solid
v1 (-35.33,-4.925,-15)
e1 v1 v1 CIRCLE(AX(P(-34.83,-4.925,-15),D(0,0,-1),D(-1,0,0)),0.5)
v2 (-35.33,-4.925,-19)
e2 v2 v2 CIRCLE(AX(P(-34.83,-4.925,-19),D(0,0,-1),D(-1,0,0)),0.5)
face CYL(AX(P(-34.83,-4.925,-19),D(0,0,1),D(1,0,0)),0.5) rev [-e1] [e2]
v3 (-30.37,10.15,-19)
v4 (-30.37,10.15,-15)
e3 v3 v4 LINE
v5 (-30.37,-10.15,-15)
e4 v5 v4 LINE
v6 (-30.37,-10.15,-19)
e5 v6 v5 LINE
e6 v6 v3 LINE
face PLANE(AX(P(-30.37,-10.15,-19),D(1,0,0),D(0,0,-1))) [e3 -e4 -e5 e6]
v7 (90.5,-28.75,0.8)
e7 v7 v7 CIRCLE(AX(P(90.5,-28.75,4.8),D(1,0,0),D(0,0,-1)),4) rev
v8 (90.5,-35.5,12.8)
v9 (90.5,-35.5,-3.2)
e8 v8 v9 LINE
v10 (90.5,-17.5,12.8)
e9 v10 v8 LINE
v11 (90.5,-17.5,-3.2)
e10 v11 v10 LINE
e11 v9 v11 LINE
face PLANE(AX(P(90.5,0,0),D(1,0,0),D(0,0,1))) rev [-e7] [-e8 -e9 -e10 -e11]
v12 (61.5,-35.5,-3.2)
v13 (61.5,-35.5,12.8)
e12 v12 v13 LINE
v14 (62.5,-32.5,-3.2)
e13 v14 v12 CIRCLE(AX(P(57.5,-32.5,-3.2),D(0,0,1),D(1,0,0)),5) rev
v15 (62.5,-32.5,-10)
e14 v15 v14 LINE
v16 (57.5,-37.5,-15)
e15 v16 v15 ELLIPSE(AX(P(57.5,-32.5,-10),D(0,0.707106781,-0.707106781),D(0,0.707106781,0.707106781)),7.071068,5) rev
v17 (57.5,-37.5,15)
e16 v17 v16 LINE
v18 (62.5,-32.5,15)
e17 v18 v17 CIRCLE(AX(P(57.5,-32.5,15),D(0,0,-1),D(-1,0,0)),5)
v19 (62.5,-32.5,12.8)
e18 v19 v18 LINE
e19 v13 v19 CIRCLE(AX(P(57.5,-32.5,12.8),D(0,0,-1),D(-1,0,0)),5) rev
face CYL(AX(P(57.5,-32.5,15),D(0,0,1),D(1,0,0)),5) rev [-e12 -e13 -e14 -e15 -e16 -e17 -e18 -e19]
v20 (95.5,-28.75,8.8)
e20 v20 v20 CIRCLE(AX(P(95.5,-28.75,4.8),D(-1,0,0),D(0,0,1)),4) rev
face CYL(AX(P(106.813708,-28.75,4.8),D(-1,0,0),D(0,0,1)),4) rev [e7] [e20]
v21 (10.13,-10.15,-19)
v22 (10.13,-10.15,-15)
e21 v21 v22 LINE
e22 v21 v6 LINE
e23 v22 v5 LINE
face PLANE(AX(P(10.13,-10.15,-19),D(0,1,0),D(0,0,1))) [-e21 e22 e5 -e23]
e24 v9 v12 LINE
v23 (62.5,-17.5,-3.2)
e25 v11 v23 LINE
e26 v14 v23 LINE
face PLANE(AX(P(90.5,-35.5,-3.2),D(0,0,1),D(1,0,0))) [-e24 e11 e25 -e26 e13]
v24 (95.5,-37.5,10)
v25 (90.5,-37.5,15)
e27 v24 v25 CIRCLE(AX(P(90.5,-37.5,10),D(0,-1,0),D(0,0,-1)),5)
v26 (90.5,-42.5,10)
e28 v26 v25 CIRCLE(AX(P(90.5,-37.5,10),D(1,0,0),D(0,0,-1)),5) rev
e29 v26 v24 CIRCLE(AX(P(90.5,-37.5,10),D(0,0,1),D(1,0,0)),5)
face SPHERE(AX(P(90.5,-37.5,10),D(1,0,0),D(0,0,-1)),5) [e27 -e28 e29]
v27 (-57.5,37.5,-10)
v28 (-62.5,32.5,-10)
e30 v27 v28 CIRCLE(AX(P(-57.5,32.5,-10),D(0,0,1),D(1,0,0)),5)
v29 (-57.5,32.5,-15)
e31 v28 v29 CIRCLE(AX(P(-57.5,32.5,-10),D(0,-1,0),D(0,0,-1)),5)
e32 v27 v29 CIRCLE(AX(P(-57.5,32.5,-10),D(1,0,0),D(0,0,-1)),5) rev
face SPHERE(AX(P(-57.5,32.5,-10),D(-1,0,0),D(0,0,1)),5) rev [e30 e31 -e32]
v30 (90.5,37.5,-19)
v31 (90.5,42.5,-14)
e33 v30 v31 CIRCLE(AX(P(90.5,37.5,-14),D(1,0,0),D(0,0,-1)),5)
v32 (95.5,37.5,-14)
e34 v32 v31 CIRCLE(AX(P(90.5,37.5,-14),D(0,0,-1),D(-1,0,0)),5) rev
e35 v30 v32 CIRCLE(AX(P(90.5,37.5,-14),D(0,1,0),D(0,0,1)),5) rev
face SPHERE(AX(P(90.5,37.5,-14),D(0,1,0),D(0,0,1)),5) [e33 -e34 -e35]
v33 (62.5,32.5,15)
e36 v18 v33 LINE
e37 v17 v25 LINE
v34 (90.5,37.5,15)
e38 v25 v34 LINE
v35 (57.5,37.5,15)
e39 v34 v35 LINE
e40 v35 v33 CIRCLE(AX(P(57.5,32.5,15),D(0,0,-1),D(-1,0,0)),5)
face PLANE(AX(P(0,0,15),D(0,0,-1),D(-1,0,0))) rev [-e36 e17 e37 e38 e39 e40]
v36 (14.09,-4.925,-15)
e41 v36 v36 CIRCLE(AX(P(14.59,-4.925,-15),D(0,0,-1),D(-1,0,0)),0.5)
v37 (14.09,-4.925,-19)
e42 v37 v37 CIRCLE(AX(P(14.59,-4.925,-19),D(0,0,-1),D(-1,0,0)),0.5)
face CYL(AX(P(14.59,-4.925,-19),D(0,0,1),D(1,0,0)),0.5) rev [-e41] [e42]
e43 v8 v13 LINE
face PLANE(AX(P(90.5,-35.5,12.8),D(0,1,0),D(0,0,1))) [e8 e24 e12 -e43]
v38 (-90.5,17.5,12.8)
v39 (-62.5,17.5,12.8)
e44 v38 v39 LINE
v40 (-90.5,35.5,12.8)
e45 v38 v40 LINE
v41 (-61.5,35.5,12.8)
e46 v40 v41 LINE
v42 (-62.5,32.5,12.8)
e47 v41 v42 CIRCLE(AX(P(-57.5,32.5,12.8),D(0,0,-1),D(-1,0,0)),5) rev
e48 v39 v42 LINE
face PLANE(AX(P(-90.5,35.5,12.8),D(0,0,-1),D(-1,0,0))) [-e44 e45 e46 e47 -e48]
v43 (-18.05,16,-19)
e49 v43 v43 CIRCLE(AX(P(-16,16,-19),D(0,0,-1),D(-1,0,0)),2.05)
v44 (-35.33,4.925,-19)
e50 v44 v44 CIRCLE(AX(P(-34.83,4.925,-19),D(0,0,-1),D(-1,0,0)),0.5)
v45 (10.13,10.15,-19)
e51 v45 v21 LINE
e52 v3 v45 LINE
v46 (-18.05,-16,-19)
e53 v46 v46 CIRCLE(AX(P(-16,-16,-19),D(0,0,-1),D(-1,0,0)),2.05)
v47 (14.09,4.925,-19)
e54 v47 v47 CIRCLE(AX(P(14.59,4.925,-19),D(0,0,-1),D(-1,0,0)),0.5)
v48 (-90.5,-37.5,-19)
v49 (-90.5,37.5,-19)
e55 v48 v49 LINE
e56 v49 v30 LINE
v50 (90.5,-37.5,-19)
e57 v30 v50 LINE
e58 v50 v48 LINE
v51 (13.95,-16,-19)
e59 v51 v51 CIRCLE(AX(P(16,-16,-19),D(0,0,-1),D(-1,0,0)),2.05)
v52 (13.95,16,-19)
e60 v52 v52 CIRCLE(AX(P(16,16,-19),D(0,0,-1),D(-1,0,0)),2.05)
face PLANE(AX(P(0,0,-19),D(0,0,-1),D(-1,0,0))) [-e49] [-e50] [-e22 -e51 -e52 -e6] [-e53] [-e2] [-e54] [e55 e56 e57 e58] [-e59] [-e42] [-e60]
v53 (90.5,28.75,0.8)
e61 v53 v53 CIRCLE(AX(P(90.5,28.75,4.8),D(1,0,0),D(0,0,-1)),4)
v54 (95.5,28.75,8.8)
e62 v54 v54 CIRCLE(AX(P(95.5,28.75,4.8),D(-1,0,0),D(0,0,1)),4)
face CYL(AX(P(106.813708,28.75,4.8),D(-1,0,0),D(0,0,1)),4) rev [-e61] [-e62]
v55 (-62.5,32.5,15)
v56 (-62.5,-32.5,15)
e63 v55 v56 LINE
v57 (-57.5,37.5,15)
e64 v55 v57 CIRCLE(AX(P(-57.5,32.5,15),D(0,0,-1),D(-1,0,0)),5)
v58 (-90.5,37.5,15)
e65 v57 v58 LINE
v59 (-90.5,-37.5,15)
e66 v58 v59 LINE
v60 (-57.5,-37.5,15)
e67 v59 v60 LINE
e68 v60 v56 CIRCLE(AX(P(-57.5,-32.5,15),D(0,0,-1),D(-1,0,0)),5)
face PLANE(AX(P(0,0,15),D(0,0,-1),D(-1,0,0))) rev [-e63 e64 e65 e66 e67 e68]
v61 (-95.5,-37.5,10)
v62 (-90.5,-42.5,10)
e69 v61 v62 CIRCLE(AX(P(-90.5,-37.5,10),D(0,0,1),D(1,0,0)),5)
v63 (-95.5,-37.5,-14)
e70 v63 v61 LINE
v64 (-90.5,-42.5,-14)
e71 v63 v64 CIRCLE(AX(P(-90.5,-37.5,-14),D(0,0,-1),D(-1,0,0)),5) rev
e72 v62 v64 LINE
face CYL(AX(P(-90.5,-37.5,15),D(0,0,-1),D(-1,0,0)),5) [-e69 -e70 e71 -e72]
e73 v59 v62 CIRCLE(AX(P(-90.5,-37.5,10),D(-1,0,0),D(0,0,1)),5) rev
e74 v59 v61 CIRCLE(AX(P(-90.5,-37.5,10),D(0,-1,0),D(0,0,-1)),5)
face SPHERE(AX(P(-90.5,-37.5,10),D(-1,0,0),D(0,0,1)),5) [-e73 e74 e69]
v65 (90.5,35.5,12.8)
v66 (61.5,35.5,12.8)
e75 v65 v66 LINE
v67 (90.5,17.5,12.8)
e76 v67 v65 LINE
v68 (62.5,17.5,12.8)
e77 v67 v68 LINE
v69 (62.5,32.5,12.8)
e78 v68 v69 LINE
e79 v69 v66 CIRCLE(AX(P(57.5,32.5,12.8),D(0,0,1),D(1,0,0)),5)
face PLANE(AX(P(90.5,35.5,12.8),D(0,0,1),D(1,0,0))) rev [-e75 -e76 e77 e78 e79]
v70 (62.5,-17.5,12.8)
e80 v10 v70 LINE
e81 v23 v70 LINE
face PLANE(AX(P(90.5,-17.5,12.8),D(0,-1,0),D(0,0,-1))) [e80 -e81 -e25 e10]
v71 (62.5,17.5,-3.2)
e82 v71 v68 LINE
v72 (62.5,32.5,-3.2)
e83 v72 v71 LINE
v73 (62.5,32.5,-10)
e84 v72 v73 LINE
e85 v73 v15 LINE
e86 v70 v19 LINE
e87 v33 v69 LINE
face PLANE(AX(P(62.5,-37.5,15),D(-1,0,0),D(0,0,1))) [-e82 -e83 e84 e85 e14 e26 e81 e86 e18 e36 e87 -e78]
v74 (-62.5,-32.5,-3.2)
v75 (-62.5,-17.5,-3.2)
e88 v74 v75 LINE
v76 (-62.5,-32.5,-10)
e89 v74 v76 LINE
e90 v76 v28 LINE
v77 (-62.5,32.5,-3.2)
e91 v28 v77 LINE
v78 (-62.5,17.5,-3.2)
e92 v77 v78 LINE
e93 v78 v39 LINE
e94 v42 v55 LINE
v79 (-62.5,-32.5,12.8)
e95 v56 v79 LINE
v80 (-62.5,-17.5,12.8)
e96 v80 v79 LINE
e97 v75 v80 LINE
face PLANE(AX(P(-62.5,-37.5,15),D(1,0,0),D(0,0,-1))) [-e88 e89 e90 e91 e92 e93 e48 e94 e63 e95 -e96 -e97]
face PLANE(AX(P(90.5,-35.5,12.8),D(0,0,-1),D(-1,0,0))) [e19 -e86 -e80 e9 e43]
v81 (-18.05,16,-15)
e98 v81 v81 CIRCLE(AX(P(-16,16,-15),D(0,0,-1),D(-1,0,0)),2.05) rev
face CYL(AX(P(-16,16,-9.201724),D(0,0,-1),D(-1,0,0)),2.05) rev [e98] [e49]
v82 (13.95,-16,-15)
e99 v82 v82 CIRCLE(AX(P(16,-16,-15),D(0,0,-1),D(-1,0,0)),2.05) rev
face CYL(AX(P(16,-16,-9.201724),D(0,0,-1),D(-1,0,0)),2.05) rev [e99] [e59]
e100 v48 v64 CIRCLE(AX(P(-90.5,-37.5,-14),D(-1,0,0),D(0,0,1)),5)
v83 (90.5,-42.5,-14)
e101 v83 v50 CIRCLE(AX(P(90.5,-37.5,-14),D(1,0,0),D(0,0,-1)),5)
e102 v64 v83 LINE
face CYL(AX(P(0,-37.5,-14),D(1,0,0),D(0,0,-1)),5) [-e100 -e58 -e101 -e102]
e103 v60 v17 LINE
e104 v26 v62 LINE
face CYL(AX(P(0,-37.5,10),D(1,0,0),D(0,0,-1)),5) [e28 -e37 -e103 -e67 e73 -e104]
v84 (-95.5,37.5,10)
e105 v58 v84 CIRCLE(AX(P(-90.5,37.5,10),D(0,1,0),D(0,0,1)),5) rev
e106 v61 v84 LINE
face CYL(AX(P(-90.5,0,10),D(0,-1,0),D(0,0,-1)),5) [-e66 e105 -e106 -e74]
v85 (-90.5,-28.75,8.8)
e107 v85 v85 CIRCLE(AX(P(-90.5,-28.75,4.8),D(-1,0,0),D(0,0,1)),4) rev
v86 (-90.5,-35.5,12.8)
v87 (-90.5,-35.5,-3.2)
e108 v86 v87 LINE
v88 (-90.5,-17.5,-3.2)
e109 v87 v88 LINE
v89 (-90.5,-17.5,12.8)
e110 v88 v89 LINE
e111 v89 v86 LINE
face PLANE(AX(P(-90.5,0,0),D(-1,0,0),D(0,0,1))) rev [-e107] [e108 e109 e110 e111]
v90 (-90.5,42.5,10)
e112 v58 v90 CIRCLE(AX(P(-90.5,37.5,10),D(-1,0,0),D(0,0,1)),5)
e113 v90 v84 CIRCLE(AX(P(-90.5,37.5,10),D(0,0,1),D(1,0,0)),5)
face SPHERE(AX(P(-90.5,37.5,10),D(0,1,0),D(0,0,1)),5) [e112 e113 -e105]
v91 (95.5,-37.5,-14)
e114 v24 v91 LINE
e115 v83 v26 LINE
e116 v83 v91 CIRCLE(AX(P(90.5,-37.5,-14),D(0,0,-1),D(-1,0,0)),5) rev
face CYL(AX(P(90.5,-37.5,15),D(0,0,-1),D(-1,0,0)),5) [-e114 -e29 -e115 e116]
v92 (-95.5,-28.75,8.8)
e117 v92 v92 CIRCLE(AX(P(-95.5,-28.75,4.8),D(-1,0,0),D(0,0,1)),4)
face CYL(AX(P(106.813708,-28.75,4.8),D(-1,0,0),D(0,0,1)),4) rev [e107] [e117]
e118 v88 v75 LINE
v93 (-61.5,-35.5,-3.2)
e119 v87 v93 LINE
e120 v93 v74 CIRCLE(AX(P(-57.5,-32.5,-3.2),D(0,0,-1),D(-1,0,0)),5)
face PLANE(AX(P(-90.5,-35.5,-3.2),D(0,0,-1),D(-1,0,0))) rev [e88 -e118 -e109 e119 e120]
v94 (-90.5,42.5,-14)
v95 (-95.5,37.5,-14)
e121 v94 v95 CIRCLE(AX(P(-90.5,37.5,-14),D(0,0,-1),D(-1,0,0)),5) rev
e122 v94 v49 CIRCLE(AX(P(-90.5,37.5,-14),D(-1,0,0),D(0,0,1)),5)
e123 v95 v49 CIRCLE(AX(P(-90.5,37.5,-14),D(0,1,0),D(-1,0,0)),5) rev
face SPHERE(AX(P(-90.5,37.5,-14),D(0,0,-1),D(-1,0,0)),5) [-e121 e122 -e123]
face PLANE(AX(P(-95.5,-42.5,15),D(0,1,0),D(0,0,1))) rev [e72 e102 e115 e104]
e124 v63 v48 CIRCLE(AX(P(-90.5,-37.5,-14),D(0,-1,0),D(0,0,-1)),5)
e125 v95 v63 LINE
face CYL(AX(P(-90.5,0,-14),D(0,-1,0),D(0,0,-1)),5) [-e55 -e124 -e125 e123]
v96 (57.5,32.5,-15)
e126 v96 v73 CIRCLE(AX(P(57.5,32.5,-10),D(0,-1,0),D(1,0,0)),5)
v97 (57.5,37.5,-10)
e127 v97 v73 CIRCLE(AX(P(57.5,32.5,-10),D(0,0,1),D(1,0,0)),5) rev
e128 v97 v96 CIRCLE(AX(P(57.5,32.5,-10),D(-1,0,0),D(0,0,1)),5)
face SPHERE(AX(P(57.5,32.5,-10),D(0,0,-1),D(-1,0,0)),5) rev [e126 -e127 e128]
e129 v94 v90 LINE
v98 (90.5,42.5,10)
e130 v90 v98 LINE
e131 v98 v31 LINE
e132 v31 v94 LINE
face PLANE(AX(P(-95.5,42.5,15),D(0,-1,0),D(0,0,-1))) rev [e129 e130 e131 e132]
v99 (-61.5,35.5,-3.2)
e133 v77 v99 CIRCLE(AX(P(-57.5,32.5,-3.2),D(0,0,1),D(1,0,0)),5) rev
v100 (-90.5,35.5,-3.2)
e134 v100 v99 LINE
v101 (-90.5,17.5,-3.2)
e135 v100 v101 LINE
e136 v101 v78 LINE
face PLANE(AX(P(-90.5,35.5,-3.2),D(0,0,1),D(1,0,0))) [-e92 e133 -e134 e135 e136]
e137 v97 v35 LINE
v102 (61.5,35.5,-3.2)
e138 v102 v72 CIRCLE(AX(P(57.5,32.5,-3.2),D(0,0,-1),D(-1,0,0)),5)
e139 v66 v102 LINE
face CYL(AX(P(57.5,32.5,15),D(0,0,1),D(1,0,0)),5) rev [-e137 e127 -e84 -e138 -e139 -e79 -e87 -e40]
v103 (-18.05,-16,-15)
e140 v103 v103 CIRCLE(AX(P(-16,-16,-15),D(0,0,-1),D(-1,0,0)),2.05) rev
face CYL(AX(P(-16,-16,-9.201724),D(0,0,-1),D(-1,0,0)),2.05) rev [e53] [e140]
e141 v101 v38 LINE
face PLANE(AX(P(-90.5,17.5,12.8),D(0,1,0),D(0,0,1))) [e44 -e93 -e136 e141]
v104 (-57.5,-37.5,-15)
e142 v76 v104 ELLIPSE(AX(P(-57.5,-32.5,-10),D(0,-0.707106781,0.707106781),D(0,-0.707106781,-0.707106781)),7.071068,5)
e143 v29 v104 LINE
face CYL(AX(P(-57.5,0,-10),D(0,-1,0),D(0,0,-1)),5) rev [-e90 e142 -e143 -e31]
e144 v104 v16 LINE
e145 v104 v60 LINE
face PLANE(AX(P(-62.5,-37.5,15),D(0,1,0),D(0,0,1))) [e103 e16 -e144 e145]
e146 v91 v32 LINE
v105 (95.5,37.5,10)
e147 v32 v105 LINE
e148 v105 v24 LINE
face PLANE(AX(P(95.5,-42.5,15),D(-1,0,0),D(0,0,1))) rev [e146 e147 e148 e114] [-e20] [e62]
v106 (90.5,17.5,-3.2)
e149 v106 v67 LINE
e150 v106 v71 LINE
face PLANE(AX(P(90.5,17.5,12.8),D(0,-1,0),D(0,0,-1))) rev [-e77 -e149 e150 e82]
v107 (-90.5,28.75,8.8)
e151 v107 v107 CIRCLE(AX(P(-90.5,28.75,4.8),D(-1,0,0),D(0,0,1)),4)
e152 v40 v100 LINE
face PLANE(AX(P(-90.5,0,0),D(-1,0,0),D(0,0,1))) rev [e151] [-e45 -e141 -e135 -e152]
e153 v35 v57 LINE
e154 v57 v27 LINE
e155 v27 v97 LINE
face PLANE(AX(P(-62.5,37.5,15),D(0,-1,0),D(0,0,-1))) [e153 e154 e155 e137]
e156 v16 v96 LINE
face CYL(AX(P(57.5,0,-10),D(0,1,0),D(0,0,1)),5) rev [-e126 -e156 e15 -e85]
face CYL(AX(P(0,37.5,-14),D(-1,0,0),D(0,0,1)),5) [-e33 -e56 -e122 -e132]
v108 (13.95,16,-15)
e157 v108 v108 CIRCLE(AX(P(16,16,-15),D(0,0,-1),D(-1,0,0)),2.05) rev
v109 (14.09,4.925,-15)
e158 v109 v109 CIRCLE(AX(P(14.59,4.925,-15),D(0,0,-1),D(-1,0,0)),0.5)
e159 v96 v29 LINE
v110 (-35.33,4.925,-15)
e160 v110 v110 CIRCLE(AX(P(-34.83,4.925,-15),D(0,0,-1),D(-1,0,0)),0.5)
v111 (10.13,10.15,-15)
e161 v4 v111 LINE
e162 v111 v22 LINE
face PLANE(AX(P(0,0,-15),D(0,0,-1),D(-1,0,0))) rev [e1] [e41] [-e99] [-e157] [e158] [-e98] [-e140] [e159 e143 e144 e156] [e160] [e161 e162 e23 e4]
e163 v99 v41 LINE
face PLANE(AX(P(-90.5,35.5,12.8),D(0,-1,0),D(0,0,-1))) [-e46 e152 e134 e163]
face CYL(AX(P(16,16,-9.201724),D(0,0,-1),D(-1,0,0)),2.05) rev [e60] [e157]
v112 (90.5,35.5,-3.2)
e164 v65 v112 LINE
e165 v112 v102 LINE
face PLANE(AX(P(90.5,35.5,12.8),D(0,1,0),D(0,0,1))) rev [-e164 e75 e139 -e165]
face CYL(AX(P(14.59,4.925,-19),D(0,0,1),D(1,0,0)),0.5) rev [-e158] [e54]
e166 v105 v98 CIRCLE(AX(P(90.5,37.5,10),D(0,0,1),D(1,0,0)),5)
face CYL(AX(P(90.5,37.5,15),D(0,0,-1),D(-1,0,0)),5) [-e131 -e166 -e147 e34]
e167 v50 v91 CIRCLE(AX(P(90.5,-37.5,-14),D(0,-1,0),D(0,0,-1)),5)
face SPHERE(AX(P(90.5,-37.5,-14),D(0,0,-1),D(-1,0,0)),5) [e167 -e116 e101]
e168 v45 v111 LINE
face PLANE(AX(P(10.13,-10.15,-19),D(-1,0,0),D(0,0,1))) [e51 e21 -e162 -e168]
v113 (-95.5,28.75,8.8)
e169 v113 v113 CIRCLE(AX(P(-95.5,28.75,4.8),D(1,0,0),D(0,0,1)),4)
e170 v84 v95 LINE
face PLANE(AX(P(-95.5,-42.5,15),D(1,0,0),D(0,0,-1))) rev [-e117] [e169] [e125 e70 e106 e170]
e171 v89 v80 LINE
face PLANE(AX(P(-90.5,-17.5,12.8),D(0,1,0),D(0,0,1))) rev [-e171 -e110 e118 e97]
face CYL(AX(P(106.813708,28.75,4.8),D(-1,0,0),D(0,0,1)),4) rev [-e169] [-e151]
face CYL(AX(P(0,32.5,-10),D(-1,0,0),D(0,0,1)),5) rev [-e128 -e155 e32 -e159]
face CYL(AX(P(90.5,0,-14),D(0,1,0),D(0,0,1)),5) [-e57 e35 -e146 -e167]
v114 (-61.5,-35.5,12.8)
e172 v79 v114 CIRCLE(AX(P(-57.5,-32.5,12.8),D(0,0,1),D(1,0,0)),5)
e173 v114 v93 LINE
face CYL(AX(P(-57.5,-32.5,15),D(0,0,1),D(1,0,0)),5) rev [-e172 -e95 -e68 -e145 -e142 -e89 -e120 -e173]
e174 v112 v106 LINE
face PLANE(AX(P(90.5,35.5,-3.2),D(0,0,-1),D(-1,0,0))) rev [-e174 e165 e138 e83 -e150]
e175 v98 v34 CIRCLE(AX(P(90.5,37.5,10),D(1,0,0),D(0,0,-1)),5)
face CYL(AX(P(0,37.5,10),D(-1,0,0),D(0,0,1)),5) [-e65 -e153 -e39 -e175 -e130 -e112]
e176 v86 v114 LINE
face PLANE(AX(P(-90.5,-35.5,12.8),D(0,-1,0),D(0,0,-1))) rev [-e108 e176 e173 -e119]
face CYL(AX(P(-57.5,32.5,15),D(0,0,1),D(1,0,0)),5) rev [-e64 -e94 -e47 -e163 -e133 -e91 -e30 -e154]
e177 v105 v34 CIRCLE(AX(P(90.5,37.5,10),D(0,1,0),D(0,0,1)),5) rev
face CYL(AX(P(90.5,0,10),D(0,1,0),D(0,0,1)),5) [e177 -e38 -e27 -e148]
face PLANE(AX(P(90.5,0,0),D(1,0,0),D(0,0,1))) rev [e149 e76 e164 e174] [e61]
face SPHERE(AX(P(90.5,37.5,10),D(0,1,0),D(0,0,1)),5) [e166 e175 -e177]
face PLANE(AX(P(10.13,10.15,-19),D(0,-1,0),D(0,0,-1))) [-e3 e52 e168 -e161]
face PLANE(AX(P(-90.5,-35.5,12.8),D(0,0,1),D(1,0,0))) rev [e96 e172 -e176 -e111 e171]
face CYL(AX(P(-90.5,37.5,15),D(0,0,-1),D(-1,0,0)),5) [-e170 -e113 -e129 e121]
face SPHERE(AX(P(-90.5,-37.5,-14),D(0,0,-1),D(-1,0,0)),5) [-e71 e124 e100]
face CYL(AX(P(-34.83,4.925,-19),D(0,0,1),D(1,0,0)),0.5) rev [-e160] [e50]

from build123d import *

# Parameters (mm, degrees)
ESBO_O1_W                 = 191
ESBO_O1_H                 = 85
ESBO_O1_W_2               = 125
ESBO_O1_H_2               = 75
RESSALTO_EXTRUS_O1_DEPTH  = 15
CORTE_EXTRUS_O1_REACH     = 198.245
ESBO_O2_R                 = 4
ESBO_O3_W                 = 16
ESBO_O3_H                 = 18
CORTE_EXTRUS_O2_DEPTH     = 28
ESPELHAR3_COPY_1_SKETCH_W = 16
ESPELHAR3_COPY_1_SKETCH_H = 18
ESPELHAR3_COPY_1_DEPTH    = 28
ESBO_O4_W                 = 191
ESBO_O4_H                 = 85
ESBO_O4_R                 = 0.5
ESBO_O4_W_2               = 40.5
ESBO_O4_H_2               = 20.3
RESSALTO_EXTRUS_O5_DEPTH  = 4
FILETE1_R                 = 5
ESBO_O5_R                 = 2.05
CORTE_EXTRUS_O3_DEPTH     = 4


with BuildPart() as part:
    # Esboço1 → Ressalto-extrusão1 (new, symmetric)
    with BuildSketch(Plane.XY):
        Rectangle(ESBO_O1_W, ESBO_O1_H)
        Rectangle(ESBO_O1_W_2, ESBO_O1_H_2, mode=Mode.SUBTRACT)
    extrude(amount=RESSALTO_EXTRUS_O1_DEPTH, both=True)

    # Corte-extrusão1: up to this face of the body (flat: up to its plane)
    corte_extrus_o1_end = Plane(part.part.faces().sort_by_distance((95.5, 0, 0))[0])
    # Esboço2 → Corte-extrusão1 (cut, up to the picked face)
    with BuildSketch(Plane.ZY.offset(95.5), mode=Mode.PRIVATE) as corte_extrus_o1_sk1:
        with Locations((4.8, -28.75)):
            Circle(ESBO_O2_R)
    corte_extrus_o1_tool1 = split(extrude(corte_extrus_o1_sk1.sketch, amount=-CORTE_EXTRUS_O1_REACH, mode=Mode.PRIVATE), bisect_by=corte_extrus_o1_end, keep=Keep.BOTH, mode=Mode.PRIVATE)
    corte_extrus_o1 = corte_extrus_o1_tool1.solids().sort_by(Axis((-95.5, -28.75, 4.8), (1, 0, 0)))[0]
    add(corte_extrus_o1, mode=Mode.SUBTRACT)

    # Esboço3 → Corte-extrusão2 (cut)
    with BuildSketch(Plane(origin=(-62.5, 0, 0), x_dir=(0, 0, -1), z_dir=(1, 0, 0))):
        with Locations((-4.8, -26.5)):
            Rectangle(ESBO_O3_W, ESBO_O3_H)
    corte_extrus_o2 = extrude(amount=-CORTE_EXTRUS_O2_DEPTH, mode=Mode.SUBTRACT)

    # Espelhar1: Corte-extrusão1 across plane
    add(corte_extrus_o1.mirror(Plane.ZX), mode=Mode.SUBTRACT)

    # Espelhar2: Corte-extrusão2 across plane
    add(corte_extrus_o2.mirror(Plane.ZX), mode=Mode.SUBTRACT)

    # Espelhar3: Corte-extrusão2 across plane
    add(corte_extrus_o2.mirror(Plane(origin=(0, 0, 0), x_dir=(0, 0, 1), z_dir=(1, 0, 0))), mode=Mode.SUBTRACT)

    # Espelhar3 copy 1 sketch → Espelhar3 copy 1 (cut)
    with BuildSketch(Plane(origin=(62.5, 0, 0), x_dir=(0, 0, -1), z_dir=(-1, 0, 0))):
        with Locations((-4.8, -26.5)):
            Rectangle(ESPELHAR3_COPY_1_SKETCH_W, ESPELHAR3_COPY_1_SKETCH_H)
    extrude(amount=-ESPELHAR3_COPY_1_DEPTH, mode=Mode.SUBTRACT)

    # Esboço4 → Ressalto-extrusão5 (add)
    with BuildSketch(Plane(origin=(0, 0, -15), x_dir=(-1, 0, 0), z_dir=(0, 0, -1))):
        Rectangle(ESBO_O4_W, ESBO_O4_H)
        with Locations((-14.59, -4.925)):
            Circle(ESBO_O4_R, mode=Mode.SUBTRACT)
        with Locations((34.83, -4.925)):
            Circle(ESBO_O4_R, mode=Mode.SUBTRACT)
        with Locations((34.83, 4.925)):
            Circle(ESBO_O4_R, mode=Mode.SUBTRACT)
        with Locations((-14.59, 4.925)):
            Circle(ESBO_O4_R, mode=Mode.SUBTRACT)
        with Locations((10.12, 0)):
            Rectangle(ESBO_O4_W_2, ESBO_O4_H_2, mode=Mode.SUBTRACT)
    extrude(amount=RESSALTO_EXTRUS_O5_DEPTH)

    # Filete1
    # the kernel refuses this fillet: 5 mm, written as the material it adds along each edge
    with BuildSketch(Plane(origin=(57.5, 32.5, -10), x_dir=(0, 1, 0), z_dir=(0, 0, -1))) as filete1_piece_1_section:
        Polygon((0, 0), (FILETE1_R, 0), (FILETE1_R, FILETE1_R), (0, FILETE1_R), align=None)
    filete1_piece_1 = extrude(amount=FILETE1_R, mode=Mode.PRIVATE)
    filete1_piece_1 = filete1_piece_1 - Plane(origin=(57.5, 32.5, -10), x_dir=(-0.7071067811865475, -0.7071067811865475, 0), z_dir=(0, 0, -1)) * Sphere(FILETE1_R, mode=Mode.PRIVATE)
    add(filete1_piece_1)
    with BuildSketch(Plane(origin=(-57.5, 32.5, -10), x_dir=(0, 1, 0), z_dir=(0, 0, -1))) as filete1_piece_2_section:
        Polygon((0, 0), (FILETE1_R, 0), (FILETE1_R, -FILETE1_R), (0, -FILETE1_R), align=None)
    filete1_piece_2 = extrude(amount=FILETE1_R, mode=Mode.PRIVATE)
    filete1_piece_2 = filete1_piece_2 - Plane(origin=(-57.5, 32.5, -10), x_dir=(0.7071067811865475, -0.7071067811865475, 0), z_dir=(0, 0, -1)) * Sphere(FILETE1_R, mode=Mode.PRIVATE)
    add(filete1_piece_2)
    with BuildSketch(Plane(origin=(62.5, 37.5, -10), x_dir=(0, -1, 0), z_dir=(0, 0, 1))) as filete1_piece_3_section:
        with BuildLine():
            CenterArc((FILETE1_R, -FILETE1_R), FILETE1_R, 90, 90)
            Line((0, -FILETE1_R), (0, 0))
            Line((0, 0), (FILETE1_R, 0))
        make_face()
    filete1_piece_3 = extrude(amount=25, mode=Mode.PRIVATE)
    filete1_piece_3 = split(filete1_piece_3, bisect_by=Plane(origin=(62.288112528, 34.58294172, -3.2), z_dir=(0, 0, -1)), keep=Keep.TOP, mode=Mode.PRIVATE)
    filete1_piece_3 = split(filete1_piece_3, bisect_by=Plane(origin=(62.288112528, 35.5, -6.6), z_dir=(0, -1, 0)), keep=Keep.TOP, mode=Mode.PRIVATE)
    add(filete1_piece_3)
    with BuildSketch(Plane(origin=(62.5, 37.5, -10), x_dir=(0, -1, 0), z_dir=(0, 0, 1))) as filete1_piece_4_section:
        with BuildLine():
            CenterArc((FILETE1_R, -FILETE1_R), FILETE1_R, 90, 90)
            Line((0, -FILETE1_R), (0, 0))
            Line((0, 0), (FILETE1_R, 0))
        make_face()
    filete1_piece_4 = extrude(amount=25, mode=Mode.PRIVATE)
    filete1_piece_4 = split(filete1_piece_4, bisect_by=Plane(origin=(61.14222039, 36.806111701, -3.2), z_dir=(0, 0, -1)), keep=Keep.TOP, mode=Mode.PRIVATE)
    filete1_piece_4 = split(filete1_piece_4, bisect_by=Plane(origin=(61.14222039, 35.5, -6.6), z_dir=(0, 1, 0)), keep=Keep.TOP, mode=Mode.PRIVATE)
    add(filete1_piece_4)
    with BuildSketch(Plane(origin=(62.5, 37.5, -10), x_dir=(0, -1, 0), z_dir=(0, 0, 1))) as filete1_piece_5_section:
        with BuildLine():
            CenterArc((FILETE1_R, -FILETE1_R), FILETE1_R, 90, 90)
            Line((0, -FILETE1_R), (0, 0))
            Line((0, 0), (FILETE1_R, 0))
        make_face()
    filete1_piece_5 = extrude(amount=25, mode=Mode.PRIVATE)
    filete1_piece_5 = split(filete1_piece_5, bisect_by=Plane(origin=(61.14222039, 36.806111701, 12.8), z_dir=(0, 0, -1)), keep=Keep.TOP, mode=Mode.PRIVATE)
    filete1_piece_5 = split(filete1_piece_5, bisect_by=Plane(origin=(61.14222039, 36.806111701, -3.2), z_dir=(0, 0, 1)), keep=Keep.TOP, mode=Mode.PRIVATE)
    filete1_piece_5 = split(filete1_piece_5, bisect_by=Plane(origin=(61.14222039, 35.5, 4.8), z_dir=(0, 1, 0)), keep=Keep.TOP, mode=Mode.PRIVATE)
    add(filete1_piece_5)
    with BuildSketch(Plane(origin=(62.5, 37.5, -10), x_dir=(0, -1, 0), z_dir=(0, 0, 1))) as filete1_piece_6_section:
        with BuildLine():
            CenterArc((FILETE1_R, -FILETE1_R), FILETE1_R, 90, 90)
            Line((0, -FILETE1_R), (0, 0))
            Line((0, 0), (FILETE1_R, 0))
        make_face()
    filete1_piece_6 = extrude(amount=25, mode=Mode.PRIVATE)
    filete1_piece_6 = split(filete1_piece_6, bisect_by=Plane(origin=(62.288112528, 34.58294172, 12.8), z_dir=(0, 0, 1)), keep=Keep.TOP, mode=Mode.PRIVATE)
    filete1_piece_6 = split(filete1_piece_6, bisect_by=Plane(origin=(62.288112528, 35.5, 13.9), z_dir=(0, -1, 0)), keep=Keep.TOP, mode=Mode.PRIVATE)
    add(filete1_piece_6)
    with BuildSketch(Plane(origin=(62.5, 37.5, -10), x_dir=(0, -1, 0), z_dir=(0, 0, 1))) as filete1_piece_7_section:
        with BuildLine():
            CenterArc((FILETE1_R, -FILETE1_R), FILETE1_R, 90, 90)
            Line((0, -FILETE1_R), (0, 0))
            Line((0, 0), (FILETE1_R, 0))
        make_face()
    filete1_piece_7 = extrude(amount=25, mode=Mode.PRIVATE)
    filete1_piece_7 = split(filete1_piece_7, bisect_by=Plane(origin=(61.14222039, 36.806111701, 12.8), z_dir=(0, 0, 1)), keep=Keep.TOP, mode=Mode.PRIVATE)
    filete1_piece_7 = split(filete1_piece_7, bisect_by=Plane(origin=(61.14222039, 35.5, 13.9), z_dir=(0, 1, 0)), keep=Keep.TOP, mode=Mode.PRIVATE)
    add(filete1_piece_7)
    with BuildSketch(Plane(origin=(-62.5, 37.5, -10), x_dir=(1, 0, 0), z_dir=(0, 0, 1))) as filete1_piece_8_section:
        with BuildLine():
            CenterArc((FILETE1_R, -FILETE1_R), FILETE1_R, 90, 90)
            Line((0, -FILETE1_R), (0, 0))
            Line((0, 0), (FILETE1_R, 0))
        make_face()
    filete1_piece_8 = extrude(amount=25, mode=Mode.PRIVATE)
    filete1_piece_8 = split(filete1_piece_8, bisect_by=Plane(origin=(-61.14222039, 35.5, -6.6), z_dir=(0, 1, 0)), keep=Keep.TOP, mode=Mode.PRIVATE)
    filete1_piece_8 = split(filete1_piece_8, bisect_by=Plane(origin=(-61.14222039, 36.806111701, -3.2), z_dir=(0, 0, -1)), keep=Keep.TOP, mode=Mode.PRIVATE)
    add(filete1_piece_8)
    with BuildSketch(Plane(origin=(-62.5, 37.5, -10), x_dir=(1, 0, 0), z_dir=(0, 0, 1))) as filete1_piece_9_section:
        with BuildLine():
            CenterArc((FILETE1_R, -FILETE1_R), FILETE1_R, 90, 90)
            Line((0, -FILETE1_R), (0, 0))
            Line((0, 0), (FILETE1_R, 0))
        make_face()
    filete1_piece_9 = extrude(amount=25, mode=Mode.PRIVATE)
    filete1_piece_9 = split(filete1_piece_9, bisect_by=Plane(origin=(-62.288112528, 35.5, -6.6), z_dir=(0, -1, 0)), keep=Keep.TOP, mode=Mode.PRIVATE)
    filete1_piece_9 = split(filete1_piece_9, bisect_by=Plane(origin=(-62.288112528, 34.58294172, -3.2), z_dir=(0, 0, -1)), keep=Keep.TOP, mode=Mode.PRIVATE)
    add(filete1_piece_9)
    with BuildSketch(Plane(origin=(-62.5, 37.5, -10), x_dir=(1, 0, 0), z_dir=(0, 0, 1))) as filete1_piece_10_section:
        with BuildLine():
            CenterArc((FILETE1_R, -FILETE1_R), FILETE1_R, 90, 90)
            Line((0, -FILETE1_R), (0, 0))
            Line((0, 0), (FILETE1_R, 0))
        make_face()
    filete1_piece_10 = extrude(amount=25, mode=Mode.PRIVATE)
    filete1_piece_10 = split(filete1_piece_10, bisect_by=Plane(origin=(-61.14222039, 35.5, 4.8), z_dir=(0, 1, 0)), keep=Keep.TOP, mode=Mode.PRIVATE)
    filete1_piece_10 = split(filete1_piece_10, bisect_by=Plane(origin=(-61.14222039, 36.806111701, -3.2), z_dir=(0, 0, 1)), keep=Keep.TOP, mode=Mode.PRIVATE)
    filete1_piece_10 = split(filete1_piece_10, bisect_by=Plane(origin=(-61.14222039, 36.806111701, 12.8), z_dir=(0, 0, -1)), keep=Keep.TOP, mode=Mode.PRIVATE)
    add(filete1_piece_10)
    with BuildSketch(Plane(origin=(-62.5, 37.5, -10), x_dir=(1, 0, 0), z_dir=(0, 0, 1))) as filete1_piece_11_section:
        with BuildLine():
            CenterArc((FILETE1_R, -FILETE1_R), FILETE1_R, 90, 90)
            Line((0, -FILETE1_R), (0, 0))
            Line((0, 0), (FILETE1_R, 0))
        make_face()
    filete1_piece_11 = extrude(amount=25, mode=Mode.PRIVATE)
    filete1_piece_11 = split(filete1_piece_11, bisect_by=Plane(origin=(-61.14222039, 35.5, 13.9), z_dir=(0, 1, 0)), keep=Keep.TOP, mode=Mode.PRIVATE)
    filete1_piece_11 = split(filete1_piece_11, bisect_by=Plane(origin=(-61.14222039, 36.806111701, 12.8), z_dir=(0, 0, 1)), keep=Keep.TOP, mode=Mode.PRIVATE)
    add(filete1_piece_11)
    with BuildSketch(Plane(origin=(-62.5, 37.5, -10), x_dir=(1, 0, 0), z_dir=(0, 0, 1))) as filete1_piece_12_section:
        with BuildLine():
            CenterArc((FILETE1_R, -FILETE1_R), FILETE1_R, 90, 90)
            Line((0, -FILETE1_R), (0, 0))
            Line((0, 0), (FILETE1_R, 0))
        make_face()
    filete1_piece_12 = extrude(amount=25, mode=Mode.PRIVATE)
    filete1_piece_12 = split(filete1_piece_12, bisect_by=Plane(origin=(-62.288112528, 35.5, 13.9), z_dir=(0, -1, 0)), keep=Keep.TOP, mode=Mode.PRIVATE)
    filete1_piece_12 = split(filete1_piece_12, bisect_by=Plane(origin=(-62.288112528, 34.58294172, 12.8), z_dir=(0, 0, 1)), keep=Keep.TOP, mode=Mode.PRIVATE)
    add(filete1_piece_12)
    with BuildSketch(Plane(origin=(57.5, 37.5, -15), x_dir=(0, 0, 1), z_dir=(-1, 0, 0))) as filete1_piece_13:
        with BuildLine():
            CenterArc((FILETE1_R, -FILETE1_R), FILETE1_R, 90, 90)
            Line((0, -FILETE1_R), (0, 0))
            Line((0, 0), (FILETE1_R, 0))
        make_face()
    extrude(amount=115)
    with BuildSketch(Plane(origin=(-62.5, 32.5, -15), x_dir=(0, 0, 1), z_dir=(0, -1, 0)), Plane(origin=(62.5, -37.5, -15), x_dir=(0, 0, 1), z_dir=(0, 1, 0))) as filete1_piece_14:
        with BuildLine():
            CenterArc((FILETE1_R, -FILETE1_R), FILETE1_R, 90, 90)
            Line((0, -FILETE1_R), (0, 0))
            Line((0, 0), (FILETE1_R, 0))
        make_face()
    extrude(amount=70)
    with BuildSketch(Plane(origin=(62.5, -37.5, -15), x_dir=(0, 1, 0), z_dir=(0, 0, 1))) as filete1_piece_15_section:
        with BuildLine():
            CenterArc((FILETE1_R, FILETE1_R), FILETE1_R, 180, 90)
            Line((0, FILETE1_R), (0, 0))
            Line((0, 0), (FILETE1_R, 0))
        make_face()
    filete1_piece_15 = extrude(amount=30, mode=Mode.PRIVATE)
    filete1_piece_15 = split(filete1_piece_15, bisect_by=Plane(origin=(62.288112528, -35.5, -9.1), z_dir=(0, 1, 0)), keep=Keep.TOP, mode=Mode.PRIVATE)
    filete1_piece_15 = split(filete1_piece_15, bisect_by=Plane(origin=(62.288112528, -34.58294172, -3.2), z_dir=(0, 0, -1)), keep=Keep.TOP, mode=Mode.PRIVATE)
    add(filete1_piece_15)
    with BuildSketch(Plane(origin=(62.5, -37.5, -15), x_dir=(0, 1, 0), z_dir=(0, 0, 1))) as filete1_piece_16_section:
        with BuildLine():
            CenterArc((FILETE1_R, FILETE1_R), FILETE1_R, 180, 90)
            Line((0, FILETE1_R), (0, 0))
            Line((0, 0), (FILETE1_R, 0))
        make_face()
    filete1_piece_16 = extrude(amount=30, mode=Mode.PRIVATE)
    filete1_piece_16 = split(filete1_piece_16, bisect_by=Plane(origin=(61.14222039, -35.5, -9.1), z_dir=(0, -1, 0)), keep=Keep.TOP, mode=Mode.PRIVATE)
    filete1_piece_16 = split(filete1_piece_16, bisect_by=Plane(origin=(61.14222039, -36.806111701, -3.2), z_dir=(0, 0, -1)), keep=Keep.TOP, mode=Mode.PRIVATE)
    add(filete1_piece_16)
    with BuildSketch(Plane(origin=(62.5, -37.5, -15), x_dir=(0, 1, 0), z_dir=(0, 0, 1))) as filete1_piece_17_section:
        with BuildLine():
            CenterArc((FILETE1_R, FILETE1_R), FILETE1_R, 180, 90)
            Line((0, FILETE1_R), (0, 0))
            Line((0, 0), (FILETE1_R, 0))
        make_face()
    filete1_piece_17 = extrude(amount=30, mode=Mode.PRIVATE)
    filete1_piece_17 = split(filete1_piece_17, bisect_by=Plane(origin=(61.14222039, -35.5, 4.8), z_dir=(0, -1, 0)), keep=Keep.TOP, mode=Mode.PRIVATE)
    filete1_piece_17 = split(filete1_piece_17, bisect_by=Plane(origin=(61.14222039, -36.806111701, 12.8), z_dir=(0, 0, -1)), keep=Keep.TOP, mode=Mode.PRIVATE)
    filete1_piece_17 = split(filete1_piece_17, bisect_by=Plane(origin=(61.14222039, -36.806111701, -3.2), z_dir=(0, 0, 1)), keep=Keep.TOP, mode=Mode.PRIVATE)
    add(filete1_piece_17)
    with BuildSketch(Plane(origin=(62.5, -37.5, -15), x_dir=(0, 1, 0), z_dir=(0, 0, 1))) as filete1_piece_18_section:
        with BuildLine():
            CenterArc((FILETE1_R, FILETE1_R), FILETE1_R, 180, 90)
            Line((0, FILETE1_R), (0, 0))
            Line((0, 0), (FILETE1_R, 0))
        make_face()
    filete1_piece_18 = extrude(amount=30, mode=Mode.PRIVATE)
    filete1_piece_18 = split(filete1_piece_18, bisect_by=Plane(origin=(62.288112528, -35.5, 13.9), z_dir=(0, 1, 0)), keep=Keep.TOP, mode=Mode.PRIVATE)
    filete1_piece_18 = split(filete1_piece_18, bisect_by=Plane(origin=(62.288112528, -34.58294172, 12.8), z_dir=(0, 0, 1)), keep=Keep.TOP, mode=Mode.PRIVATE)
    add(filete1_piece_18)
    with BuildSketch(Plane(origin=(62.5, -37.5, -15), x_dir=(0, 1, 0), z_dir=(0, 0, 1))) as filete1_piece_19_section:
        with BuildLine():
            CenterArc((FILETE1_R, FILETE1_R), FILETE1_R, 180, 90)
            Line((0, FILETE1_R), (0, 0))
            Line((0, 0), (FILETE1_R, 0))
        make_face()
    filete1_piece_19 = extrude(amount=30, mode=Mode.PRIVATE)
    filete1_piece_19 = split(filete1_piece_19, bisect_by=Plane(origin=(61.14222039, -35.5, 13.9), z_dir=(0, -1, 0)), keep=Keep.TOP, mode=Mode.PRIVATE)
    filete1_piece_19 = split(filete1_piece_19, bisect_by=Plane(origin=(61.14222039, -36.806111701, 12.8), z_dir=(0, 0, 1)), keep=Keep.TOP, mode=Mode.PRIVATE)
    add(filete1_piece_19)
    with BuildSketch(Plane(origin=(-62.5, -37.5, 15), x_dir=(0, 1, 0), z_dir=(0, 0, -1))) as filete1_piece_20_section:
        with BuildLine():
            CenterArc((FILETE1_R, FILETE1_R), FILETE1_R, 180, 90)
            Line((0, FILETE1_R), (0, 0))
            Line((0, 0), (FILETE1_R, 0))
        make_face()
    filete1_piece_20 = extrude(amount=30, mode=Mode.PRIVATE)
    filete1_piece_20 = split(filete1_piece_20, bisect_by=Plane(origin=(-62.288112528, -34.58294172, 12.8), z_dir=(0, 0, 1)), keep=Keep.TOP, mode=Mode.PRIVATE)
    filete1_piece_20 = split(filete1_piece_20, bisect_by=Plane(origin=(-62.288112528, -35.5, 13.9), z_dir=(0, 1, 0)), keep=Keep.TOP, mode=Mode.PRIVATE)
    add(filete1_piece_20)
    with BuildSketch(Plane(origin=(-62.5, -37.5, 15), x_dir=(0, 1, 0), z_dir=(0, 0, -1))) as filete1_piece_21_section:
        with BuildLine():
            CenterArc((FILETE1_R, FILETE1_R), FILETE1_R, 180, 90)
            Line((0, FILETE1_R), (0, 0))
            Line((0, 0), (FILETE1_R, 0))
        make_face()
    filete1_piece_21 = extrude(amount=30, mode=Mode.PRIVATE)
    filete1_piece_21 = split(filete1_piece_21, bisect_by=Plane(origin=(-61.14222039, -36.806111701, 12.8), z_dir=(0, 0, 1)), keep=Keep.TOP, mode=Mode.PRIVATE)
    filete1_piece_21 = split(filete1_piece_21, bisect_by=Plane(origin=(-61.14222039, -35.5, 13.9), z_dir=(0, -1, 0)), keep=Keep.TOP, mode=Mode.PRIVATE)
    add(filete1_piece_21)
    with BuildSketch(Plane(origin=(-62.5, -37.5, 15), x_dir=(0, 1, 0), z_dir=(0, 0, -1))) as filete1_piece_22_section:
        with BuildLine():
            CenterArc((FILETE1_R, FILETE1_R), FILETE1_R, 180, 90)
            Line((0, FILETE1_R), (0, 0))
            Line((0, 0), (FILETE1_R, 0))
        make_face()
    filete1_piece_22 = extrude(amount=30, mode=Mode.PRIVATE)
    filete1_piece_22 = split(filete1_piece_22, bisect_by=Plane(origin=(-61.14222039, -36.806111701, 12.8), z_dir=(0, 0, -1)), keep=Keep.TOP, mode=Mode.PRIVATE)
    filete1_piece_22 = split(filete1_piece_22, bisect_by=Plane(origin=(-61.14222039, -35.5, 4.8), z_dir=(0, -1, 0)), keep=Keep.TOP, mode=Mode.PRIVATE)
    filete1_piece_22 = split(filete1_piece_22, bisect_by=Plane(origin=(-61.14222039, -36.806111701, -3.2), z_dir=(0, 0, 1)), keep=Keep.TOP, mode=Mode.PRIVATE)
    add(filete1_piece_22)
    with BuildSketch(Plane(origin=(-62.5, -37.5, 15), x_dir=(0, 1, 0), z_dir=(0, 0, -1))) as filete1_piece_23_section:
        with BuildLine():
            CenterArc((FILETE1_R, FILETE1_R), FILETE1_R, 180, 90)
            Line((0, FILETE1_R), (0, 0))
            Line((0, 0), (FILETE1_R, 0))
        make_face()
    filete1_piece_23 = extrude(amount=30, mode=Mode.PRIVATE)
    filete1_piece_23 = split(filete1_piece_23, bisect_by=Plane(origin=(-62.288112528, -35.5, -9.1), z_dir=(0, 1, 0)), keep=Keep.TOP, mode=Mode.PRIVATE)
    filete1_piece_23 = split(filete1_piece_23, bisect_by=Plane(origin=(-62.288112528, -34.58294172, -3.2), z_dir=(0, 0, -1)), keep=Keep.TOP, mode=Mode.PRIVATE)
    add(filete1_piece_23)
    with BuildSketch(Plane(origin=(-62.5, -37.5, 15), x_dir=(0, 1, 0), z_dir=(0, 0, -1))) as filete1_piece_24_section:
        with BuildLine():
            CenterArc((FILETE1_R, FILETE1_R), FILETE1_R, 180, 90)
            Line((0, FILETE1_R), (0, 0))
            Line((0, 0), (FILETE1_R, 0))
        make_face()
    filete1_piece_24 = extrude(amount=30, mode=Mode.PRIVATE)
    filete1_piece_24 = split(filete1_piece_24, bisect_by=Plane(origin=(-61.14222039, -35.5, -9.1), z_dir=(0, -1, 0)), keep=Keep.TOP, mode=Mode.PRIVATE)
    filete1_piece_24 = split(filete1_piece_24, bisect_by=Plane(origin=(-61.14222039, -36.806111701, -3.2), z_dir=(0, 0, -1)), keep=Keep.TOP, mode=Mode.PRIVATE)
    add(filete1_piece_24)
    # the kernel refuses this fillet: 5 mm, written as the material it takes off along each edge
    with BuildSketch(Plane(origin=(90.5, -37.5, 10), x_dir=(1, 0, 0), z_dir=(0, -1, 0))) as filete1_2_piece_1_section:
        Polygon((0, 0), (FILETE1_R, 0), (FILETE1_R, FILETE1_R), (0, FILETE1_R), align=None)
    filete1_2_piece_1 = extrude(amount=FILETE1_R, mode=Mode.PRIVATE)
    filete1_2_piece_1 = filete1_2_piece_1 - Plane(origin=(90.5, -37.5, 10), x_dir=(-0.7071067811865475, 0, -0.7071067811865475), z_dir=(0, -1, 0)) * Sphere(FILETE1_R, mode=Mode.PRIVATE)
    add(filete1_2_piece_1, mode=Mode.SUBTRACT)
    with BuildSketch(Plane(origin=(90.5, 37.5, 10), x_dir=(1, 0, 0), z_dir=(0, 1, 0))) as filete1_2_piece_2_section:
        Polygon((0, 0), (FILETE1_R, 0), (FILETE1_R, -FILETE1_R), (0, -FILETE1_R), align=None)
    filete1_2_piece_2 = extrude(amount=FILETE1_R, mode=Mode.PRIVATE)
    filete1_2_piece_2 = filete1_2_piece_2 - Plane(origin=(90.5, 37.5, 10), x_dir=(-0.7071067811865475, 0, -0.7071067811865475), z_dir=(0, 1, 0)) * Sphere(FILETE1_R, mode=Mode.PRIVATE)
    add(filete1_2_piece_2, mode=Mode.SUBTRACT)
    with BuildSketch(Plane(origin=(-90.5, 37.5, 10), x_dir=(-1, 0, 0), z_dir=(0, 1, 0))) as filete1_2_piece_3_section:
        Polygon((0, 0), (FILETE1_R, 0), (FILETE1_R, FILETE1_R), (0, FILETE1_R), align=None)
    filete1_2_piece_3 = extrude(amount=FILETE1_R, mode=Mode.PRIVATE)
    filete1_2_piece_3 = filete1_2_piece_3 - Plane(origin=(-90.5, 37.5, 10), x_dir=(0.7071067811865475, 0, -0.7071067811865475), z_dir=(0, 1, 0)) * Sphere(FILETE1_R, mode=Mode.PRIVATE)
    add(filete1_2_piece_3, mode=Mode.SUBTRACT)
    with BuildSketch(Plane(origin=(-90.5, -37.5, 10), x_dir=(-1, 0, 0), z_dir=(0, -1, 0))) as filete1_2_piece_4_section:
        Polygon((0, 0), (FILETE1_R, 0), (FILETE1_R, -FILETE1_R), (0, -FILETE1_R), align=None)
    filete1_2_piece_4 = extrude(amount=FILETE1_R, mode=Mode.PRIVATE)
    filete1_2_piece_4 = filete1_2_piece_4 - Plane(origin=(-90.5, -37.5, 10), x_dir=(0.7071067811865475, 0, -0.7071067811865475), z_dir=(0, -1, 0)) * Sphere(FILETE1_R, mode=Mode.PRIVATE)
    add(filete1_2_piece_4, mode=Mode.SUBTRACT)
    with BuildSketch(Plane(origin=(90.5, -37.5, -14), x_dir=(1, 0, 0), z_dir=(0, -1, 0))) as filete1_2_piece_5_section:
        Polygon((0, 0), (FILETE1_R, 0), (FILETE1_R, -FILETE1_R), (0, -FILETE1_R), align=None)
    filete1_2_piece_5 = extrude(amount=FILETE1_R, mode=Mode.PRIVATE)
    filete1_2_piece_5 = filete1_2_piece_5 - Plane(origin=(90.5, -37.5, -14), x_dir=(-0.7071067811865475, 0, 0.7071067811865475), z_dir=(0, -1, 0)) * Sphere(FILETE1_R, mode=Mode.PRIVATE)
    add(filete1_2_piece_5, mode=Mode.SUBTRACT)
    with BuildSketch(Plane(origin=(90.5, 37.5, -14), x_dir=(1, 0, 0), z_dir=(0, 1, 0))) as filete1_2_piece_6_section:
        Polygon((0, 0), (FILETE1_R, 0), (FILETE1_R, FILETE1_R), (0, FILETE1_R), align=None)
    filete1_2_piece_6 = extrude(amount=FILETE1_R, mode=Mode.PRIVATE)
    filete1_2_piece_6 = filete1_2_piece_6 - Plane(origin=(90.5, 37.5, -14), x_dir=(-0.7071067811865475, 0, 0.7071067811865475), z_dir=(0, 1, 0)) * Sphere(FILETE1_R, mode=Mode.PRIVATE)
    add(filete1_2_piece_6, mode=Mode.SUBTRACT)
    with BuildSketch(Plane(origin=(-90.5, -37.5, -14), x_dir=(0, 0, -1), z_dir=(0, -1, 0))) as filete1_2_piece_7_section:
        Polygon((0, 0), (FILETE1_R, 0), (FILETE1_R, -FILETE1_R), (0, -FILETE1_R), align=None)
    filete1_2_piece_7 = extrude(amount=FILETE1_R, mode=Mode.PRIVATE)
    filete1_2_piece_7 = filete1_2_piece_7 - Plane(origin=(-90.5, -37.5, -14), x_dir=(0.7071067811865475, 0, 0.7071067811865475), z_dir=(0, -1, 0)) * Sphere(FILETE1_R, mode=Mode.PRIVATE)
    add(filete1_2_piece_7, mode=Mode.SUBTRACT)
    with BuildSketch(Plane(origin=(-90.5, 37.5, -14), x_dir=(0, 0, -1), z_dir=(0, 1, 0))) as filete1_2_piece_8_section:
        Polygon((0, 0), (FILETE1_R, 0), (FILETE1_R, FILETE1_R), (0, FILETE1_R), align=None)
    filete1_2_piece_8 = extrude(amount=FILETE1_R, mode=Mode.PRIVATE)
    filete1_2_piece_8 = filete1_2_piece_8 - Plane(origin=(-90.5, 37.5, -14), x_dir=(0.7071067811865475, 0, 0.7071067811865475), z_dir=(0, 1, 0)) * Sphere(FILETE1_R, mode=Mode.PRIVATE)
    add(filete1_2_piece_8, mode=Mode.SUBTRACT)
    with BuildSketch(Plane(origin=(95.5, -37.5, 15), x_dir=(0, 0, -1), z_dir=(0, 1, 0)), Plane(origin=(-95.5, 37.5, 15), x_dir=(0, 0, -1), z_dir=(0, -1, 0)), Plane(origin=(-95.5, 37.5, -19), x_dir=(1, 0, 0), z_dir=(0, -1, 0))) as filete1_2_piece_9:
        with BuildLine():
            CenterArc((FILETE1_R, FILETE1_R), FILETE1_R, 180, 90)
            Line((0, FILETE1_R), (0, 0))
            Line((0, 0), (FILETE1_R, 0))
        make_face()
    extrude(amount=75, mode=Mode.SUBTRACT)
    with BuildSketch(Plane(origin=(95.5, -37.5, -19), x_dir=(0, 0, 1), z_dir=(0, 1, 0))) as filete1_2_piece_10:
        with BuildLine():
            CenterArc((FILETE1_R, -FILETE1_R), FILETE1_R, 90, 90)
            Line((0, -FILETE1_R), (0, 0))
            Line((0, 0), (FILETE1_R, 0))
        make_face()
    extrude(amount=75, mode=Mode.SUBTRACT)
    with BuildSketch(Plane(origin=(-90.5, -42.5, -19), x_dir=(0, 0, 1), z_dir=(1, 0, 0)), Plane(origin=(90.5, 42.5, -19), x_dir=(0, 0, 1), z_dir=(-1, 0, 0))) as filete1_2_piece_11:
        with BuildLine():
            CenterArc((FILETE1_R, -FILETE1_R), FILETE1_R, 90, 90)
            Line((0, -FILETE1_R), (0, 0))
            Line((0, 0), (FILETE1_R, 0))
        make_face()
    extrude(amount=181, mode=Mode.SUBTRACT)
    with BuildSketch(Plane(origin=(-95.5, -42.5, 10), x_dir=(1, 0, 0), z_dir=(0, 0, -1)), Plane(origin=(95.5, -42.5, -14), x_dir=(-1, 0, 0), z_dir=(0, 0, 1)), Plane(origin=(95.5, 42.5, -14), x_dir=(0, -1, 0), z_dir=(0, 0, 1))) as filete1_2_piece_12:
        with BuildLine():
            CenterArc((FILETE1_R, -FILETE1_R), FILETE1_R, 90, 90)
            Line((0, -FILETE1_R), (0, 0))
            Line((0, 0), (FILETE1_R, 0))
        make_face()
    extrude(amount=24, mode=Mode.SUBTRACT)
    with BuildSketch(Plane(origin=(-95.5, 42.5, 10), x_dir=(1, 0, 0), z_dir=(0, 0, -1))) as filete1_2_piece_13:
        with BuildLine():
            CenterArc((FILETE1_R, FILETE1_R), FILETE1_R, 180, 90)
            Line((0, FILETE1_R), (0, 0))
            Line((0, 0), (FILETE1_R, 0))
        make_face()
    extrude(amount=24, mode=Mode.SUBTRACT)
    with BuildSketch(Plane(origin=(-90.5, -42.5, 15), x_dir=(0, 0, -1), z_dir=(1, 0, 0)), Plane(origin=(90.5, 42.5, 15), x_dir=(0, 0, -1), z_dir=(-1, 0, 0))) as filete1_2_piece_14:
        with BuildLine():
            CenterArc((FILETE1_R, FILETE1_R), FILETE1_R, 180, 90)
            Line((0, FILETE1_R), (0, 0))
            Line((0, 0), (FILETE1_R, 0))
        make_face()
    extrude(amount=181, mode=Mode.SUBTRACT)

    # Esboço5 → Corte-extrusão3 (cut)
    with BuildSketch(Plane(origin=(0, 0, -19), x_dir=(-1, 0, 0), z_dir=(0, 0, -1))):
        with Locations((-16, 16)):
            Circle(ESBO_O5_R)
        with Locations((16, 16)):
            Circle(ESBO_O5_R)
        with Locations((16, -16)):
            Circle(ESBO_O5_R)
        with Locations((-16, -16)):
            Circle(ESBO_O5_R)
    extrude(amount=-CORTE_EXTRUS_O3_DEPTH, mode=Mode.SUBTRACT)


solid = part.part
